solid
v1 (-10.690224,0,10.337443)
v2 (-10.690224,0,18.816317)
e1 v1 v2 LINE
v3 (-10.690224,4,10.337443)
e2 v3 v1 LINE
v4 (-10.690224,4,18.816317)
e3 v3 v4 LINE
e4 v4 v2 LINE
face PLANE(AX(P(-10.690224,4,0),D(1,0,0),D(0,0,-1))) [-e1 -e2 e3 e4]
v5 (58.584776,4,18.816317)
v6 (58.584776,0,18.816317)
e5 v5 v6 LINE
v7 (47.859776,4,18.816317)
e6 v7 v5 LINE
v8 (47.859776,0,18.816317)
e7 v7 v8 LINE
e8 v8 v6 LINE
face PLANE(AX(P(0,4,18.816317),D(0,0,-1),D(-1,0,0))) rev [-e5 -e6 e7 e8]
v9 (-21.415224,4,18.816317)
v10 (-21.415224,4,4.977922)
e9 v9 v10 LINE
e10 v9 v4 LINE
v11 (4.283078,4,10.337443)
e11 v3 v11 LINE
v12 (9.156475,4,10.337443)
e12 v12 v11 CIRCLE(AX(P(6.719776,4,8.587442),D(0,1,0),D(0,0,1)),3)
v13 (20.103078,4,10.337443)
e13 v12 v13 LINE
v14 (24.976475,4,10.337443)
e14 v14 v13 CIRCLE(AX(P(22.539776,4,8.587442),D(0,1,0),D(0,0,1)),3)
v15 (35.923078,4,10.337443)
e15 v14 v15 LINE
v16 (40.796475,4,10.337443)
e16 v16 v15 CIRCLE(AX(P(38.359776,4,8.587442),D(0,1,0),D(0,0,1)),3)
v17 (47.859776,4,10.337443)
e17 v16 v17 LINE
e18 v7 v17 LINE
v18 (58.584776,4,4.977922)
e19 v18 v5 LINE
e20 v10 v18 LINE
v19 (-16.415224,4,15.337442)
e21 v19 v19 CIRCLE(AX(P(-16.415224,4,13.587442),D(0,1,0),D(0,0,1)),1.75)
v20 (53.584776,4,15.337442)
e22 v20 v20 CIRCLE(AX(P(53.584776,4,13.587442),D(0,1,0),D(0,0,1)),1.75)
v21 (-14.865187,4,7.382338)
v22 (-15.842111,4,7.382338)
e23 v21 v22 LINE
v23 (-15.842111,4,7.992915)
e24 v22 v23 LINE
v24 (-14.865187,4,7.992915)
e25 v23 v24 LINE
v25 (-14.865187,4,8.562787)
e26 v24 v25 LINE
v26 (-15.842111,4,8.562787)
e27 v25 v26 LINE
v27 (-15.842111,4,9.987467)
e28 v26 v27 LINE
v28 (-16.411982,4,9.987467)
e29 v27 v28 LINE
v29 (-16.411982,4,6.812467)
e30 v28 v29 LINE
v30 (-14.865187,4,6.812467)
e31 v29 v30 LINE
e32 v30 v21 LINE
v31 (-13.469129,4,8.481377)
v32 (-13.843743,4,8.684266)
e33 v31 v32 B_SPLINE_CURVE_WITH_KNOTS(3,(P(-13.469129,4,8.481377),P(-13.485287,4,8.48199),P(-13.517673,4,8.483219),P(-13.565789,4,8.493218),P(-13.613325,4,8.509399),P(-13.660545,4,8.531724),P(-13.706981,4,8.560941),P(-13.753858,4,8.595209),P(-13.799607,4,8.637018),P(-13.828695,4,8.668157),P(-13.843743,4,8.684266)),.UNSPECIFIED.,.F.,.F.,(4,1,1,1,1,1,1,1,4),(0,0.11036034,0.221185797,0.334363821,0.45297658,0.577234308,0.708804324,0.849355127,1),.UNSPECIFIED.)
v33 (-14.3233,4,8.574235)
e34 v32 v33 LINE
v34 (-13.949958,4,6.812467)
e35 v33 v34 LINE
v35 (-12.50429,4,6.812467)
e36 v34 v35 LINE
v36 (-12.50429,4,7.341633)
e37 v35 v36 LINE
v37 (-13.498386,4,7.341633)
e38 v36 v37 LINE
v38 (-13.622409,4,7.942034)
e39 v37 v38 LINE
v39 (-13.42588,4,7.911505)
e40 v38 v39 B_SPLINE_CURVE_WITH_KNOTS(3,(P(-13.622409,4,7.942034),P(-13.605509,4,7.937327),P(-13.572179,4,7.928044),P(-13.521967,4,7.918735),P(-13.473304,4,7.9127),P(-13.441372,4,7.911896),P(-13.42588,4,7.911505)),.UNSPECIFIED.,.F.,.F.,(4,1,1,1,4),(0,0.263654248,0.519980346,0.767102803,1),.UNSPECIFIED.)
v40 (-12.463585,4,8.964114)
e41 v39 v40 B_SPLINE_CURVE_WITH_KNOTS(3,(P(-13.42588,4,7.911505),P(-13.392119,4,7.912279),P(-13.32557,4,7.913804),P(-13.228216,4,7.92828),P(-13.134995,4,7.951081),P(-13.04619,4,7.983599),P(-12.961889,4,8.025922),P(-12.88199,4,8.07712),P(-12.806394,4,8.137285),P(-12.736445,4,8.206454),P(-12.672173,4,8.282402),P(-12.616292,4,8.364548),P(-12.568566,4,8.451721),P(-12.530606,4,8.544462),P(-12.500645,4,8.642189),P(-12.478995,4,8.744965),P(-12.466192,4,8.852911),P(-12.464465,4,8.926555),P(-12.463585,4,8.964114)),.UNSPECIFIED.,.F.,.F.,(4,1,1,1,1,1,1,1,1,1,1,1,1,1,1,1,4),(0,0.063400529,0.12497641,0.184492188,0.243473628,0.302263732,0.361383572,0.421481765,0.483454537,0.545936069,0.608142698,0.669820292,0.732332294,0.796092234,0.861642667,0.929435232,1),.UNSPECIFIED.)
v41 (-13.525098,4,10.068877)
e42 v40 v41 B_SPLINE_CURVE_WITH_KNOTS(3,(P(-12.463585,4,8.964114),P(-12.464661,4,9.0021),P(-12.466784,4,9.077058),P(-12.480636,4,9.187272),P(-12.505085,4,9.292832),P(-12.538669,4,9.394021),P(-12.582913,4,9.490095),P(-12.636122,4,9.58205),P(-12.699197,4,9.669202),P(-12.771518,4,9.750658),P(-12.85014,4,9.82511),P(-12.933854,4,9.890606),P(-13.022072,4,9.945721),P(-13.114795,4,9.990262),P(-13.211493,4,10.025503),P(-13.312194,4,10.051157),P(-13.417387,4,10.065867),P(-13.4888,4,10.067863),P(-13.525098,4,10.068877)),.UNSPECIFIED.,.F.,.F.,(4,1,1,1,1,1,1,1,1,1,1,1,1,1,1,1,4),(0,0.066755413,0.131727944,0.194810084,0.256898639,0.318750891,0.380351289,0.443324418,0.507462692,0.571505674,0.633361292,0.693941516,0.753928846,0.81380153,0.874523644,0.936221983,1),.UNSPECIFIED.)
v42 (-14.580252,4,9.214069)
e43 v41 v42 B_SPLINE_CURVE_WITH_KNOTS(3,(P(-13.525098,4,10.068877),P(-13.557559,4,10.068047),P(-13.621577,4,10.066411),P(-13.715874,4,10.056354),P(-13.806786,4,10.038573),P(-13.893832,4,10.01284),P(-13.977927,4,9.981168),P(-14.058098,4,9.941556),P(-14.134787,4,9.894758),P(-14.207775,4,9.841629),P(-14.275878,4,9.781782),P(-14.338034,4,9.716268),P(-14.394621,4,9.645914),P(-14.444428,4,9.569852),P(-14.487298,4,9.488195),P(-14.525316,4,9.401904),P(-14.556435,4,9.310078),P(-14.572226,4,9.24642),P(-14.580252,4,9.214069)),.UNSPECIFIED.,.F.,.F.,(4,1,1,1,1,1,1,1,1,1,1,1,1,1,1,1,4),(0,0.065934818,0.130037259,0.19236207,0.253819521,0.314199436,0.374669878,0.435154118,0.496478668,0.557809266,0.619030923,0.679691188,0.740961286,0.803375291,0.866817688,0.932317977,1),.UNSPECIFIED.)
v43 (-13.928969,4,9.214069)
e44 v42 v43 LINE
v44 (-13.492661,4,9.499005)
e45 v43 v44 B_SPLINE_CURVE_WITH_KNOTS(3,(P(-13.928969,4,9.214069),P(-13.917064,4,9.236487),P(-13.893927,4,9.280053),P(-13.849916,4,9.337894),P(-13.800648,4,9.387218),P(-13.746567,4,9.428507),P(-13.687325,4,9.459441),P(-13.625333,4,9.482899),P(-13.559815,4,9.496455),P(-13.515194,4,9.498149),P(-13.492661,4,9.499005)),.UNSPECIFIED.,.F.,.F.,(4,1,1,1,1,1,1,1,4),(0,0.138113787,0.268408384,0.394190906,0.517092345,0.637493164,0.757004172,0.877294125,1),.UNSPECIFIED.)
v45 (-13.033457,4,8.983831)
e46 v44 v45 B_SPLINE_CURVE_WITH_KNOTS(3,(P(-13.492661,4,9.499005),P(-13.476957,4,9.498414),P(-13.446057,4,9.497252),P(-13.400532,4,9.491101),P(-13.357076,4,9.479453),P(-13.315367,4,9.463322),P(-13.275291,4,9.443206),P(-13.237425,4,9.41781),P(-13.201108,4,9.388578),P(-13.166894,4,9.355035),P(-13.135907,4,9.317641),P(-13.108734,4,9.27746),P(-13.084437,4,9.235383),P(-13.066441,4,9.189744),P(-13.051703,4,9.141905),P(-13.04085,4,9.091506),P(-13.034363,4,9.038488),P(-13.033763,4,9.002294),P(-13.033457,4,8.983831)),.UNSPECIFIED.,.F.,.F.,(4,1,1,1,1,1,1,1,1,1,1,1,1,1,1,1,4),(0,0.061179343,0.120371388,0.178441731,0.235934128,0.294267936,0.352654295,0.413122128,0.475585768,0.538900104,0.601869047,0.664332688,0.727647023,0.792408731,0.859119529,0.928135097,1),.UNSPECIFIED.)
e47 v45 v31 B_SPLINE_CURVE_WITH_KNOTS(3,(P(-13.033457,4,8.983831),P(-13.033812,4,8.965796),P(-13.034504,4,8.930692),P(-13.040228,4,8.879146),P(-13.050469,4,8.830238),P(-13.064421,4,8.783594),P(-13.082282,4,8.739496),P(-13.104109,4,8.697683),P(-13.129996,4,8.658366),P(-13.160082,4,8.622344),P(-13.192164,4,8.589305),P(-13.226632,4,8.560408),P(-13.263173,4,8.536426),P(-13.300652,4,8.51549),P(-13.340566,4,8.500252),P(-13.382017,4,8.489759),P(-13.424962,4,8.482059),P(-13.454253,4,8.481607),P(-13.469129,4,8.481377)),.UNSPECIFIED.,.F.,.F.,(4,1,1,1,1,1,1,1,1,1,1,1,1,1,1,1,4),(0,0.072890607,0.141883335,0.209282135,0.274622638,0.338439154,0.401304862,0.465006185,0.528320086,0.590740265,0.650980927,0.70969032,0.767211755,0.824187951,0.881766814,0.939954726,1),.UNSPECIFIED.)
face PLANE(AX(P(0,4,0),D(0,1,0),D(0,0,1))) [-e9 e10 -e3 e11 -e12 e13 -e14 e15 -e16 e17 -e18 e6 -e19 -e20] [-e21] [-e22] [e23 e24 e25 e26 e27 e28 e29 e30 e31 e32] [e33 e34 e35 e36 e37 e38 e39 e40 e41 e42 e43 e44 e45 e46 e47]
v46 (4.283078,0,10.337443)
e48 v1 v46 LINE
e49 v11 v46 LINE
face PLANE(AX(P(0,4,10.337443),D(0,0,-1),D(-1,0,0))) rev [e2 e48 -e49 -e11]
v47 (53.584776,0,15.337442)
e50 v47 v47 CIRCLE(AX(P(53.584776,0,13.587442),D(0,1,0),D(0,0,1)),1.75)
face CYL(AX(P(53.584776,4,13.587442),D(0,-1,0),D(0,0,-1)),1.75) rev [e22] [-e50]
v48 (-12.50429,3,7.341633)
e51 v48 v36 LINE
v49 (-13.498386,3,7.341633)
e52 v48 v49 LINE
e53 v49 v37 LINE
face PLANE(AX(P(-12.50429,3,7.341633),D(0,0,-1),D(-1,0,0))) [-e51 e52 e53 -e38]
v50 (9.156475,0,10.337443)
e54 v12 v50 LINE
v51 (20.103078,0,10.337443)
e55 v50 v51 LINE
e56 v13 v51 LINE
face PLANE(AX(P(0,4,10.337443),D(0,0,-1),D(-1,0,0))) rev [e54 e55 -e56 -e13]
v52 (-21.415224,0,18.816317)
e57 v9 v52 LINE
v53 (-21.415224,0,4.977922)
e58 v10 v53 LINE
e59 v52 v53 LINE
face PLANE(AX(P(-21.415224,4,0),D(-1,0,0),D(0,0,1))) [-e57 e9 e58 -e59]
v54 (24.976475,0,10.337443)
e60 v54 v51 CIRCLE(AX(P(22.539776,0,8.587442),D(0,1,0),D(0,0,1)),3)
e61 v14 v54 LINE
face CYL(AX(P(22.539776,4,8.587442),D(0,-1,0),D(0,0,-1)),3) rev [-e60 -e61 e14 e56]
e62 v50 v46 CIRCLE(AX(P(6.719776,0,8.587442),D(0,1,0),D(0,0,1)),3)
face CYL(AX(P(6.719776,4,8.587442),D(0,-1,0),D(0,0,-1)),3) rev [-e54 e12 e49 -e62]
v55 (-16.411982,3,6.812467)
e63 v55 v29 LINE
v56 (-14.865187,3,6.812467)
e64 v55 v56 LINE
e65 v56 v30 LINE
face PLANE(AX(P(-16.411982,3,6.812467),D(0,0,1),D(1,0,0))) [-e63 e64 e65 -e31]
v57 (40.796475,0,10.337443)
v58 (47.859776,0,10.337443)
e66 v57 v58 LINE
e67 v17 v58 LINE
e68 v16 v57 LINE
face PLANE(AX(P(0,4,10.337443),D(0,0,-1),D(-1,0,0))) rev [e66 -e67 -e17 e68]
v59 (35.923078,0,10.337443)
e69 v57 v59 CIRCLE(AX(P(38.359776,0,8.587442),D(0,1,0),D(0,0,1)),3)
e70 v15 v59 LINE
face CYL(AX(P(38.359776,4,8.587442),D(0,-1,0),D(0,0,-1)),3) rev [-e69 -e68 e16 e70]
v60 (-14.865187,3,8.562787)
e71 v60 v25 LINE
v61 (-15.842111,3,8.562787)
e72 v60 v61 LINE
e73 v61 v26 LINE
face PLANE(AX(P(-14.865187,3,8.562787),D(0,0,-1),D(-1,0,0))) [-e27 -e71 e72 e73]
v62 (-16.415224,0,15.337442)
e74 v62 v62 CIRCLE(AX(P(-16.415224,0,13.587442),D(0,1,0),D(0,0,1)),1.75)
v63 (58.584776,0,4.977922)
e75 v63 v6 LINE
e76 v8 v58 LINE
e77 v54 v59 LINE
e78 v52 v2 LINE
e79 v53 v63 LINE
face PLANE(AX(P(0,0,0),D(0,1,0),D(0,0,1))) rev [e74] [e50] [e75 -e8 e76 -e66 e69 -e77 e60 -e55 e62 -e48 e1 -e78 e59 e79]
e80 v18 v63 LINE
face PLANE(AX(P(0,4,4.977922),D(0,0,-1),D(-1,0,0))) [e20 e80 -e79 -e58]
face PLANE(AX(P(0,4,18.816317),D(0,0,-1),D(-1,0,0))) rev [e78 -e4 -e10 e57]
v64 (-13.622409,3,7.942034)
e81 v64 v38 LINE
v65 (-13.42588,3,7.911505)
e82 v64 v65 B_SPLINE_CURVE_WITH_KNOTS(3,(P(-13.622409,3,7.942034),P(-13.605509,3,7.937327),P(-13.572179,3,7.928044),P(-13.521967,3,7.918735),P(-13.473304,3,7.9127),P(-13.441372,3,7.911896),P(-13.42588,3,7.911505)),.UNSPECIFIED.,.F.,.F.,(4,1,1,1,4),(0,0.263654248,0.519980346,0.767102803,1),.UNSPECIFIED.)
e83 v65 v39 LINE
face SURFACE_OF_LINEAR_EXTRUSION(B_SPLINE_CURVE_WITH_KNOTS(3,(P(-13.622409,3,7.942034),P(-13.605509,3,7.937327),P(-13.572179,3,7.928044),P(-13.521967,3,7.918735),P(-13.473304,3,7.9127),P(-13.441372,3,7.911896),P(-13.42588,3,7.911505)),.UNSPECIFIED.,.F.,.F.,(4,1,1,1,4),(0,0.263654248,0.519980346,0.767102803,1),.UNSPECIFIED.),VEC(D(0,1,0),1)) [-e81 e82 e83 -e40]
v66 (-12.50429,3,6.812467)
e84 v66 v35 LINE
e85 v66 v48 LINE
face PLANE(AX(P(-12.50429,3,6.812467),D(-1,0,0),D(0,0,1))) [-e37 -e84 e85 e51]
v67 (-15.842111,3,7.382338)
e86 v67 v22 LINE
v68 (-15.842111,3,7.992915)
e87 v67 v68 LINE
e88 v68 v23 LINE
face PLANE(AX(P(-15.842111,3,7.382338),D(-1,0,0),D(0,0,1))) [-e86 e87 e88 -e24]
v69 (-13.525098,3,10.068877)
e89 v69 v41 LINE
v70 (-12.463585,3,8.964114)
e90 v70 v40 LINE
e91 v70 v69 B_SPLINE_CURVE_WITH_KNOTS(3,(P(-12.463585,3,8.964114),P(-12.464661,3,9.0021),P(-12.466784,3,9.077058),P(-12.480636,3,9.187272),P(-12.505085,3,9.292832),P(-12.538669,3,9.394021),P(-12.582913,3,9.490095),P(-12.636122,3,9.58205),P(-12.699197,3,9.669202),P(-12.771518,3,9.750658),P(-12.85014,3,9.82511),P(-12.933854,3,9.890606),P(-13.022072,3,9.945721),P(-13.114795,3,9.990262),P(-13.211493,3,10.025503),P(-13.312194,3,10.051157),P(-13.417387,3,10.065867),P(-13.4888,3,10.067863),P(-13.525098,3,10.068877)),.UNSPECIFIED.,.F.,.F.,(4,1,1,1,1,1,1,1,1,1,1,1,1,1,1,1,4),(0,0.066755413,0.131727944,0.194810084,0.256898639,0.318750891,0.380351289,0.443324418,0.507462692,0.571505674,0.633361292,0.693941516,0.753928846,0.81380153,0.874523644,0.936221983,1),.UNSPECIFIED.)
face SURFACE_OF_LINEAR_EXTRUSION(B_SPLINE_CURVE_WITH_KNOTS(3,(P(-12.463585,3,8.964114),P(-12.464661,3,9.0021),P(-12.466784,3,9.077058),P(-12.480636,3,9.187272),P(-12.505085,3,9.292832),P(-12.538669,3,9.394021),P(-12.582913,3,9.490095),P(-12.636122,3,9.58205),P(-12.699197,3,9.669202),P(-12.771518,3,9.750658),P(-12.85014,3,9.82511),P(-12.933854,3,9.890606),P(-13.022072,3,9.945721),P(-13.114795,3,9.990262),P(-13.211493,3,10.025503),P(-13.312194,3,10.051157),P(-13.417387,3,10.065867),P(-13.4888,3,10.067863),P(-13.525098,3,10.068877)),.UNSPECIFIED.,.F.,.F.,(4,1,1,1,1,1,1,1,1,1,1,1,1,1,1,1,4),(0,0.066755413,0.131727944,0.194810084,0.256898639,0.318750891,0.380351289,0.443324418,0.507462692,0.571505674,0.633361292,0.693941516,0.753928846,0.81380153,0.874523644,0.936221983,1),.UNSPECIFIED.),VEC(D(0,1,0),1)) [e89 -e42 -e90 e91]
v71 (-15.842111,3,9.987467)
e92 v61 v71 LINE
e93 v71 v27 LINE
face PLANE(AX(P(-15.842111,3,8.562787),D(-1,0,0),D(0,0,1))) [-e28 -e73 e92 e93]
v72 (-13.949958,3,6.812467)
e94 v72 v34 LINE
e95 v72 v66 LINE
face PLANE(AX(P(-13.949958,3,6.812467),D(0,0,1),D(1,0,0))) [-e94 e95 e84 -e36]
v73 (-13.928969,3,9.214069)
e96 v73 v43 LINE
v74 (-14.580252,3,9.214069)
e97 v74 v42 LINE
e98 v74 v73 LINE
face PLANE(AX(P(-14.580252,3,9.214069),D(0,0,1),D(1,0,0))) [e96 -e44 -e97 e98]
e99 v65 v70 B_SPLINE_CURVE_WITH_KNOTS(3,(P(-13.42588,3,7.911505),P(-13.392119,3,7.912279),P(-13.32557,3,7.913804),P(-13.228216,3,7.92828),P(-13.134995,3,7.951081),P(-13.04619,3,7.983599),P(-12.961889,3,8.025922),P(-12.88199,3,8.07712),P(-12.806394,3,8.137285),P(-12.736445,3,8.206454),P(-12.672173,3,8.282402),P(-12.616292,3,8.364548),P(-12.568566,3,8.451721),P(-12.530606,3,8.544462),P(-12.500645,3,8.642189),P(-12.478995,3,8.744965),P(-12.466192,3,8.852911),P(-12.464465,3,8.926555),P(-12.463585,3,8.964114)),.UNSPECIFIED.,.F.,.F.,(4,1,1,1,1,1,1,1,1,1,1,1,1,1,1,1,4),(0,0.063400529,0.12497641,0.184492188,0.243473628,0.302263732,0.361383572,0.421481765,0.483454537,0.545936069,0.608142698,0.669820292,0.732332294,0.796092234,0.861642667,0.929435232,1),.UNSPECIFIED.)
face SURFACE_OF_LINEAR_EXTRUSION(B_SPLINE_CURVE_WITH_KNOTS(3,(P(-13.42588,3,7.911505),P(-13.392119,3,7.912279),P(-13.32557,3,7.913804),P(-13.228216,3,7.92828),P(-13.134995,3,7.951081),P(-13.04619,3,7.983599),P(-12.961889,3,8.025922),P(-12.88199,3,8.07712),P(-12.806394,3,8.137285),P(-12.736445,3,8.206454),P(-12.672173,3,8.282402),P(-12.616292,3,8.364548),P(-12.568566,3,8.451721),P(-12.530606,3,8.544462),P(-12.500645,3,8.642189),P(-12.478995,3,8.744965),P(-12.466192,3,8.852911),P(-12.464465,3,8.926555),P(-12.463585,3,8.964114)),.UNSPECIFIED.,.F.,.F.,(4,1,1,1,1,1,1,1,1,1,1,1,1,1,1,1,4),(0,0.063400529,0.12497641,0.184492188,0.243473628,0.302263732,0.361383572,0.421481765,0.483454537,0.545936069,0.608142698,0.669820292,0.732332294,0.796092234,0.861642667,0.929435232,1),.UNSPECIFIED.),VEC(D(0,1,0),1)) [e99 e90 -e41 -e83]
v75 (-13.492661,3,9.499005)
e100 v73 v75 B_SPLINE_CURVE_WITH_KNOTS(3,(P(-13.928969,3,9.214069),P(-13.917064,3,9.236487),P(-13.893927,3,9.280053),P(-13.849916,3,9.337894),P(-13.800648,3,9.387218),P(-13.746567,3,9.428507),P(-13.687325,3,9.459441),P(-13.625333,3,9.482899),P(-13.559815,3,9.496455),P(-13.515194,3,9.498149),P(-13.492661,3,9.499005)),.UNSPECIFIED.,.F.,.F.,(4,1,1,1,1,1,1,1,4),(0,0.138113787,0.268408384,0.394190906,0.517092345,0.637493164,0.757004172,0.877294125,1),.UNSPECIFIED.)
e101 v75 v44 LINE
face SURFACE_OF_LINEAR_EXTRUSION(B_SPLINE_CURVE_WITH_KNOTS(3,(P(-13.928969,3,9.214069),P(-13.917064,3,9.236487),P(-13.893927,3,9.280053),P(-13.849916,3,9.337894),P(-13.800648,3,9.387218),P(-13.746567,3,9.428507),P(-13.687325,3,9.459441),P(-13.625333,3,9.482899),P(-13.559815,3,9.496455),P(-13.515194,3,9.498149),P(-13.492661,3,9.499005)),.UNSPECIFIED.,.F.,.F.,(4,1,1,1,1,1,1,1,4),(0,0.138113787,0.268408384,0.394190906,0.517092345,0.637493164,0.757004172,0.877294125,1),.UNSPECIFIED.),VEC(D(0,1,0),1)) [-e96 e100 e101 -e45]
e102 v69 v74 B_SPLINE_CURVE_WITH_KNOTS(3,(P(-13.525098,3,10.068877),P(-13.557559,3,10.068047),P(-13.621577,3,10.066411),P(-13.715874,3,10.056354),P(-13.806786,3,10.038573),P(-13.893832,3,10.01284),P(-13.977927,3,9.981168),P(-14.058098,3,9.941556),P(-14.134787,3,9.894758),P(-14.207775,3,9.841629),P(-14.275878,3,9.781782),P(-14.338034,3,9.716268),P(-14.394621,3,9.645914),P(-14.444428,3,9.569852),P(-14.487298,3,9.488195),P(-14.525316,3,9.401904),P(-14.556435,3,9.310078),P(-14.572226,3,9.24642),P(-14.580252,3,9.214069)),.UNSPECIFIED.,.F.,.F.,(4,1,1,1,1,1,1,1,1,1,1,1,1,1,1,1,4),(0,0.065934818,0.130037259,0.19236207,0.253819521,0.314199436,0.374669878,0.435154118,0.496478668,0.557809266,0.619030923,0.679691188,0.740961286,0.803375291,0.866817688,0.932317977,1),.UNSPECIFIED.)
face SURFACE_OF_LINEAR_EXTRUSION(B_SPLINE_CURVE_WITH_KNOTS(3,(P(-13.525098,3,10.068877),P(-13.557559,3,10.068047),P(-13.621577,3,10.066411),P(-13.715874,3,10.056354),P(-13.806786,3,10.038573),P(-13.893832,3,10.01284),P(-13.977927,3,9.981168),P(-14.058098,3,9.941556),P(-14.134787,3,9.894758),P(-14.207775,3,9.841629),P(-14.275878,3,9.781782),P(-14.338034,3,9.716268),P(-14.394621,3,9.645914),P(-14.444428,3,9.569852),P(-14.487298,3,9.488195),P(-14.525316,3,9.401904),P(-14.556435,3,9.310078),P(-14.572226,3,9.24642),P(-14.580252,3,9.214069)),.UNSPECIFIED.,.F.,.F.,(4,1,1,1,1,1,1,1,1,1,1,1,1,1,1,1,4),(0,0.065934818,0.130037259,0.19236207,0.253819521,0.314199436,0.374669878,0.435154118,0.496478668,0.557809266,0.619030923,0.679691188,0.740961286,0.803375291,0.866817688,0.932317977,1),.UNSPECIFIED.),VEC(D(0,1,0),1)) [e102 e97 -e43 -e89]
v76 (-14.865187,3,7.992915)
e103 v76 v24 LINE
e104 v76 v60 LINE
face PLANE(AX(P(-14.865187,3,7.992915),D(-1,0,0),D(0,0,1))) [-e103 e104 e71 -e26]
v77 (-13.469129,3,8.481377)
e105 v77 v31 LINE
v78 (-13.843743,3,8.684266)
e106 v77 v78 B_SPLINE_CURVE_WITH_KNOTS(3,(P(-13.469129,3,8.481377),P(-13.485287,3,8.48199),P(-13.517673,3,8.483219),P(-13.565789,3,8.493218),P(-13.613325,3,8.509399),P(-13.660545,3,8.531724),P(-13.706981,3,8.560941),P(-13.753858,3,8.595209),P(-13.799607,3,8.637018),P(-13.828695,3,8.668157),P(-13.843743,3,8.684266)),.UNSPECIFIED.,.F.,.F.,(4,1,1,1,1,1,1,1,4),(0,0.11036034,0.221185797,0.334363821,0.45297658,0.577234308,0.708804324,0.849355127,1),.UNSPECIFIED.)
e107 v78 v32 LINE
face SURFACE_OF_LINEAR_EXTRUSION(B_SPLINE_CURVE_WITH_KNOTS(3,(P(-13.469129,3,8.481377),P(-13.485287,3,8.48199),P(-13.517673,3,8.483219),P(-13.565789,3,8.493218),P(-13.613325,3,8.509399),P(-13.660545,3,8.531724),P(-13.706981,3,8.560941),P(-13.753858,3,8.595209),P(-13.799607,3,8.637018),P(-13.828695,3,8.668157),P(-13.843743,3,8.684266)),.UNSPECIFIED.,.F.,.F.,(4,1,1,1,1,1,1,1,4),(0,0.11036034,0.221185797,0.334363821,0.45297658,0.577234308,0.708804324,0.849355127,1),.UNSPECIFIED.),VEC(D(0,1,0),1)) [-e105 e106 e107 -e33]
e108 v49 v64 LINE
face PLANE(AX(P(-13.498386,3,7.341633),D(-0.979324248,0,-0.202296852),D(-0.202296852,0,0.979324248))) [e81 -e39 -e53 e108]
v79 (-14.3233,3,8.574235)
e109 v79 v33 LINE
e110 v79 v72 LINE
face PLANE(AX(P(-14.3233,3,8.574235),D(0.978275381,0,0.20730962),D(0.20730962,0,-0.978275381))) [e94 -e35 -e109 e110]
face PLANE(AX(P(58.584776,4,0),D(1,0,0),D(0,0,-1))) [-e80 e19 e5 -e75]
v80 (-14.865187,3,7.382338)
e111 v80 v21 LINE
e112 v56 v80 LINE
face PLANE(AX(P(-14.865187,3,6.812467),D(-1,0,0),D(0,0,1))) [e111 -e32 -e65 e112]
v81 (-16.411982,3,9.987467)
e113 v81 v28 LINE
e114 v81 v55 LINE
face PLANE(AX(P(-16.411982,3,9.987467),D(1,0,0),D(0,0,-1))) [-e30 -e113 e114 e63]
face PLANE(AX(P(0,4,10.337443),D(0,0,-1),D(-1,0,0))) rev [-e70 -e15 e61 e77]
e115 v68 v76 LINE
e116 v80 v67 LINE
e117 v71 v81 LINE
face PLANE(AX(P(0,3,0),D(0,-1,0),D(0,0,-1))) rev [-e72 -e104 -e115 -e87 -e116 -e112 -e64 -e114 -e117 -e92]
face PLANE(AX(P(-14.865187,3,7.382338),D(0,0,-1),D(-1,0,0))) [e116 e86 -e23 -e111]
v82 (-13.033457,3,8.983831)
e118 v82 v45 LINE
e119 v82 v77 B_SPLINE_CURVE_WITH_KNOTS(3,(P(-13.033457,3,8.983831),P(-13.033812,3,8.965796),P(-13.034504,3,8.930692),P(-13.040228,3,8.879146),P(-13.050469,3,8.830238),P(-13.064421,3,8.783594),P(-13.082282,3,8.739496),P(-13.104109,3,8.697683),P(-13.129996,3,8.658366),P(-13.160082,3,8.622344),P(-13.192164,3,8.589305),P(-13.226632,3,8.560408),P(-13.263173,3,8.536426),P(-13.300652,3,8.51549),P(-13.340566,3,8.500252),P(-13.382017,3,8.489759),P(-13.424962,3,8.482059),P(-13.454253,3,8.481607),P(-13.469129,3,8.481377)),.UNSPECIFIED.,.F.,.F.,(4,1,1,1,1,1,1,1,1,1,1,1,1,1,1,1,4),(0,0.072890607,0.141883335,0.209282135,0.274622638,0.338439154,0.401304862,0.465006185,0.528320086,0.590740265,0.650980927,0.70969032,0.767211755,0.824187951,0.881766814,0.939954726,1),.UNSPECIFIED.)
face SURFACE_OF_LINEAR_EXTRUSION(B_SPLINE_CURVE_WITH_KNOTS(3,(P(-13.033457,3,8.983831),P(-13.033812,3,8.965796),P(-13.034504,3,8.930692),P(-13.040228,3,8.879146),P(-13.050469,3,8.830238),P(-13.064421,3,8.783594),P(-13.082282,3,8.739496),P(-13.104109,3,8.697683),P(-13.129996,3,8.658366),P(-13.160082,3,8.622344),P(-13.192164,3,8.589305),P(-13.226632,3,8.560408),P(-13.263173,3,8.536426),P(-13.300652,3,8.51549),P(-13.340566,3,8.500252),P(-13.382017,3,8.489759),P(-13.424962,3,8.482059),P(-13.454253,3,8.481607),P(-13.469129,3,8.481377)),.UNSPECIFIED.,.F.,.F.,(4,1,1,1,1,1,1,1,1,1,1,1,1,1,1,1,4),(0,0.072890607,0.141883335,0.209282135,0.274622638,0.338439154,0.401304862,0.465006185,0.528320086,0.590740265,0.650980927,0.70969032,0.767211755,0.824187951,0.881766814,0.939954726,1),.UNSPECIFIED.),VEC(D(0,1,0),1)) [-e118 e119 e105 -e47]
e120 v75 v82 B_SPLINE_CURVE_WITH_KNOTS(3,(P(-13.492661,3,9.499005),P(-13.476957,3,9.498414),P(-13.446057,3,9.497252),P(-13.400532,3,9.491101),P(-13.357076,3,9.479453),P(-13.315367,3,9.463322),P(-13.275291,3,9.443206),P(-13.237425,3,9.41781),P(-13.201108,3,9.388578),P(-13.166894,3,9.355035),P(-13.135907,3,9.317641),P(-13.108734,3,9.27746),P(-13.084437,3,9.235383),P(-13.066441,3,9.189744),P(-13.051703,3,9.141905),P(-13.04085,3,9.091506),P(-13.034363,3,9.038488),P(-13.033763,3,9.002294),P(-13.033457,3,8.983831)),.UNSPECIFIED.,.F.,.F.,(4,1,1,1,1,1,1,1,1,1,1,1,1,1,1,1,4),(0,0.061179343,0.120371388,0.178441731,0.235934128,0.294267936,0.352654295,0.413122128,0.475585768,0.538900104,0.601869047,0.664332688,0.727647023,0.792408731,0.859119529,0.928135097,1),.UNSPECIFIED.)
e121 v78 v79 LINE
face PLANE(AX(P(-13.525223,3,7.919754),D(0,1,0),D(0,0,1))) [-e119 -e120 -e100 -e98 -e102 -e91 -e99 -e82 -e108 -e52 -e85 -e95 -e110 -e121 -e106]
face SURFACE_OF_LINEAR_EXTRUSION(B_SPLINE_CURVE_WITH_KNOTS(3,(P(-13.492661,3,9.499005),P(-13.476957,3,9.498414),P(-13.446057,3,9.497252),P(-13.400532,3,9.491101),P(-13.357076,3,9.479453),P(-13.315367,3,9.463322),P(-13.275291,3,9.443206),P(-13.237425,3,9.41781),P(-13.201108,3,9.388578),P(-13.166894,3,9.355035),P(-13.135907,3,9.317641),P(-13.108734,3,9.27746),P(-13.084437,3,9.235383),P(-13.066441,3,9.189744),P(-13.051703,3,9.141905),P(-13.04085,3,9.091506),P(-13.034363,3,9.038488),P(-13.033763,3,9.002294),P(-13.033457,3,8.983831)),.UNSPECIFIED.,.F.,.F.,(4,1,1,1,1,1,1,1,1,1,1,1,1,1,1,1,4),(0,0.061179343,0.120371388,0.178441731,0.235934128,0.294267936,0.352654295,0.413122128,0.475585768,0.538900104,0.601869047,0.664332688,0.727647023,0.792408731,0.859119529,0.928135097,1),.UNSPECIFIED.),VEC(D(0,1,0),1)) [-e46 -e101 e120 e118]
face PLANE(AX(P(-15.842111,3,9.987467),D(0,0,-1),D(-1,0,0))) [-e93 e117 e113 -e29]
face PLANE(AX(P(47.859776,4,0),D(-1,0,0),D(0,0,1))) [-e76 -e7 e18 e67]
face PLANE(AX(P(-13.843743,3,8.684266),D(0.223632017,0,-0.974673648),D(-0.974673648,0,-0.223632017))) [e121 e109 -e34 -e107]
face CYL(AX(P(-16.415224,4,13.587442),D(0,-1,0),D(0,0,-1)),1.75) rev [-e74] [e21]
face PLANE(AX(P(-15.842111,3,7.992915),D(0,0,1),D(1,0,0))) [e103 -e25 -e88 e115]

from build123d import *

# Parameters (mm, degrees)
BOSS_EXTRUDE1_OUTLINE_R = 1.75
BOSS_EXTRUDE1_DEPTH     = 4
CUT_EXTRUDE1_DEPTH      = 1


# Read off the part's stored shape, not the designer's step: Boss-Extrude1
with BuildPart() as part:
    # Boss-Extrude1 outline → Boss-Extrude1 (new body)
    with BuildSketch(Plane(origin=(0, 0, 0), x_dir=(1, 0, 0), z_dir=(0, 1, 0))):
        with BuildLine():
            Line((24.976474615, -10.33744254), (35.92307775, -10.33744254))
            ThreePointArc((35.92307775, -10.33744254), (38.359776182, -5.587442326), (40.796474615, -10.33744254))
            Line((40.796474615, -10.33744254), (47.859776182, -10.33744254))
            Line((47.859776182, -10.33744254), (47.859776182, -18.81631662))
            Line((47.859776182, -18.81631662), (58.584776182, -18.81631662))
            Line((58.584776182, -18.81631662), (58.584776182, -4.977921711))
            Line((58.584776182, -4.977921711), (-21.415223818, -4.977921711))
            Line((-21.415223818, -4.977921711), (-21.415223818, -18.81631662))
            Line((-21.415223818, -18.81631662), (-10.690223818, -18.81631662))
            Line((-10.690223818, -18.81631662), (-10.690223818, -10.33744254))
            Line((-10.690223818, -10.33744254), (4.28307775, -10.33744254))
            ThreePointArc((4.28307775, -10.33744254), (6.719776183, -5.587442326), (9.156474615, -10.33744254))
            Line((9.156474615, -10.33744254), (20.10307775, -10.33744254))
            ThreePointArc((20.10307775, -10.33744254), (22.539776182, -5.587442326), (24.976474615, -10.33744254))
        make_face()
        with Locations((-16.415223818, -13.587442433)):
            Circle(BOSS_EXTRUDE1_OUTLINE_R, mode=Mode.SUBTRACT)
        with Locations((53.584776182, -13.587442433)):
            Circle(BOSS_EXTRUDE1_OUTLINE_R, mode=Mode.SUBTRACT)
    extrude(amount=BOSS_EXTRUDE1_DEPTH)

    # Sketch2 → Cut-Extrude1 (cut)
    with BuildSketch(Plane(origin=(0, 4, 0), x_dir=(1, 0, 0), z_dir=(0, 1, 0))):
        Polygon((-16.41198232, -6.812466594), (-14.865187448, -6.812466594), (-14.865187448, -7.382338389), (-15.842110525, -7.382338389), (-15.842110525, -7.992915312), (-14.865187448, -7.992915312), (-14.865187448, -8.562787107), (-15.842110525, -8.562787107), (-15.842110525, -9.987466594), (-16.41198232, -9.987466594), align=None)
        with BuildLine():
            Line((-13.949958082, -6.812466594), (-12.504290013, -6.812466594))
            Line((-12.504290013, -6.812466594), (-12.504290013, -7.341633261))
            Line((-12.504290013, -7.341633261), (-13.498385565, -7.341633261))
            Line((-13.498385565, -7.341633261), (-13.622409003, -7.942033902))
            add(Edge.make_bspline(
                [(-13.622409003, -7.942033902), (-13.605509034, -7.937327047), (-13.572178824, -7.928044162), (-13.52196682, -7.918734604), (-13.473304391, -7.912700444), (-13.441372402, -7.911895568), (-13.425879556, -7.911505055)],
                knots=[0, 0, 0, 0, 1.05461699, 2.079921384, 3.068411212, 4, 4, 4, 4], degree=3))
            add(Edge.make_bspline(
                [(-13.425879556, -7.911505055), (-13.392119021, -7.912278658), (-13.325569569, -7.913803601), (-13.228216166, -7.928280275), (-13.134994532, -7.951080599), (-13.046189934, -7.983598566), (-12.961889124, -8.025921539), (-12.881989912, -8.077120472), (-12.806394235, -8.137285289), (-12.73644499, -8.20645366), (-12.672172703, -8.282402096), (-12.616291615, -8.364548366), (-12.568565678, -8.451721144), (-12.530606118, -8.544462294), (-12.500645197, -8.642189339), (-12.478994766, -8.744964906), (-12.466191785, -8.852910799), (-12.464465382, -8.926554564), (-12.463584884, -8.96411423)],
                knots=[0, 0, 0, 0, 1.01440847, 1.999622559, 2.951875003, 3.895578053, 4.836219714, 5.782137149, 6.743708247, 7.735272588, 8.734977101, 9.730283169, 10.717124674, 11.717316708, 12.737475749, 13.78628267, 14.87096371, 16, 16, 16, 16], degree=3))
            add(Edge.make_bspline(
                [(-12.463584884, -8.96411423), (-12.464660866, -9.002100285), (-12.466784093, -9.077057875), (-12.480636202, -9.187272048), (-12.505085424, -9.292832343), (-12.538668877, -9.394021345), (-12.582912926, -9.490095338), (-12.63612245, -9.582049577), (-12.699197079, -9.669201514), (-12.771517834, -9.750657738), (-12.850139982, -9.82511029), (-12.93385401, -9.890606342), (-13.022071802, -9.94572074), (-13.114795487, -9.990262491), (-13.211493079, -10.025503132), (-13.312193927, -10.051156636), (-13.417387424, -10.065867495), (-13.488800141, -10.067862709), (-13.525098306, -10.06887685)],
                knots=[0, 0, 0, 0, 1.06808661, 2.107647099, 3.116961351, 4.110378221, 5.100014249, 6.085620622, 7.093190682, 8.119403071, 9.144090782, 10.133780668, 11.103064255, 12.062861538, 13.020824475, 13.992378307, 14.979551724, 16, 16, 16, 16], degree=3))
            add(Edge.make_bspline(
                [(-13.525098306, -10.06887685), (-13.557558674, -10.068047219), (-13.621577314, -10.066411014), (-13.715873961, -10.056354031), (-13.806786399, -10.038573192), (-13.893831984, -10.012839713), (-13.97792658, -9.981167676), (-14.058098031, -9.941555807), (-14.134786891, -9.894758372), (-14.207775393, -9.841629423), (-14.275877579, -9.781781722), (-14.338034038, -9.716268103), (-14.394621073, -9.645914331), (-14.444427811, -9.569852456), (-14.487298122, -9.488194854), (-14.525316388, -9.40190388), (-14.556434719, -9.310078379), (-14.572226377, -9.24641984), (-14.580251551, -9.214069158)],
                knots=[0, 0, 0, 0, 1.054957082, 2.080596141, 3.077793124, 4.061112343, 5.027190972, 5.994718051, 6.962465889, 7.943658696, 8.924948258, 9.904494768, 10.875059, 11.855380583, 12.854004648, 13.869083016, 14.917087635, 16, 16, 16, 16], degree=3))
            Line((-14.580251551, -9.214069158), (-13.9289695, -9.214069158))
            add(Edge.make_bspline(
                [(-13.9289695, -9.214069158), (-13.917064048, -9.236486864), (-13.893927162, -9.280053116), (-13.849915688, -9.337893862), (-13.800647638, -9.387217966), (-13.746567435, -9.428507334), (-13.687324675, -9.459440626), (-13.625333386, -9.482899003), (-13.559814799, -9.496454731), (-13.515193749, -9.498149331), (-13.492661407, -9.499005055)],
                knots=[0, 0, 0, 0, 1.104910296, 2.147267069, 3.153527244, 4.136738762, 5.099945312, 6.05603338, 7.018353, 8, 8, 8, 8], degree=3))
            add(Edge.make_bspline(
                [(-13.492661407, -9.499005055), (-13.476956667, -9.49841417), (-13.446057326, -9.497251594), (-13.400532034, -9.491101274), (-13.357076143, -9.479452707), (-13.315366568, -9.463322149), (-13.275291268, -9.443205522), (-13.237424734, -9.417809591), (-13.201108159, -9.388577933), (-13.166894426, -9.355034506), (-13.135906647, -9.317641387), (-13.108733754, -9.277459932), (-13.08443744, -9.235382981), (-13.066440789, -9.189743761), (-13.051703054, -9.141905074), (-13.040849589, -9.09150606), (-13.03436342, -9.038487855), (-13.033762974, -9.002293813), (-13.033456679, -8.983830777)],
                knots=[0, 0, 0, 0, 0.978869489, 1.925942215, 2.855067702, 3.774946051, 4.70828698, 5.642468714, 6.60995405, 7.609372294, 8.622401667, 9.629904756, 10.629323, 11.642352373, 12.678539694, 13.745912462, 14.850161547, 16, 16, 16, 16], degree=3))
            add(Edge.make_bspline(
                [(-13.033456679, -8.983830777), (-13.03381217, -8.965796309), (-13.034504141, -8.930691779), (-13.040228266, -8.879145756), (-13.050468615, -8.830237908), (-13.064421178, -8.783593638), (-13.082282125, -8.739496193), (-13.104109396, -8.697683084), (-13.129996239, -8.65836566), (-13.160081636, -8.622344386), (-13.192164393, -8.589304649), (-13.226631584, -8.560408358), (-13.263172677, -8.536426443), (-13.300652202, -8.515489534), (-13.340566208, -8.500252107), (-13.382017188, -8.489758654), (-13.424961552, -8.48205898), (-13.454252971, -8.481606596), (-13.469128755, -8.48137685)],
                knots=[0, 0, 0, 0, 1.166249705, 2.270133367, 3.348514167, 4.393962215, 5.415026464, 6.420877785, 7.440098956, 8.453121383, 9.451844239, 10.415694839, 11.355045125, 12.27538808, 13.187007209, 14.108269027, 15.039275622, 16, 16, 16, 16], degree=3))
            add(Edge.make_bspline(
                [(-13.469128755, -8.48137685), (-13.485287313, -8.481989978), (-13.51767253, -8.483218817), (-13.565788856, -8.493217552), (-13.613325034, -8.509399257), (-13.660545412, -8.531724482), (-13.706981248, -8.560941158), (-13.753858004, -8.59520897), (-13.799606617, -8.637017798), (-13.828694857, -8.668157109), (-13.843743138, -8.684266474)],
                knots=[0, 0, 0, 0, 0.88288272, 1.769486374, 2.674910571, 3.623812639, 4.617874466, 5.670434592, 6.794841017, 8, 8, 8, 8], degree=3))
            Line((-13.843743138, -8.684266474), (-14.323300429, -8.574235424))
            Line((-14.323300429, -8.574235424), (-13.949958082, -6.812466594))
        make_face()
    extrude(amount=-CUT_EXTRUDE1_DEPTH, mode=Mode.SUBTRACT)


solid = part.part
